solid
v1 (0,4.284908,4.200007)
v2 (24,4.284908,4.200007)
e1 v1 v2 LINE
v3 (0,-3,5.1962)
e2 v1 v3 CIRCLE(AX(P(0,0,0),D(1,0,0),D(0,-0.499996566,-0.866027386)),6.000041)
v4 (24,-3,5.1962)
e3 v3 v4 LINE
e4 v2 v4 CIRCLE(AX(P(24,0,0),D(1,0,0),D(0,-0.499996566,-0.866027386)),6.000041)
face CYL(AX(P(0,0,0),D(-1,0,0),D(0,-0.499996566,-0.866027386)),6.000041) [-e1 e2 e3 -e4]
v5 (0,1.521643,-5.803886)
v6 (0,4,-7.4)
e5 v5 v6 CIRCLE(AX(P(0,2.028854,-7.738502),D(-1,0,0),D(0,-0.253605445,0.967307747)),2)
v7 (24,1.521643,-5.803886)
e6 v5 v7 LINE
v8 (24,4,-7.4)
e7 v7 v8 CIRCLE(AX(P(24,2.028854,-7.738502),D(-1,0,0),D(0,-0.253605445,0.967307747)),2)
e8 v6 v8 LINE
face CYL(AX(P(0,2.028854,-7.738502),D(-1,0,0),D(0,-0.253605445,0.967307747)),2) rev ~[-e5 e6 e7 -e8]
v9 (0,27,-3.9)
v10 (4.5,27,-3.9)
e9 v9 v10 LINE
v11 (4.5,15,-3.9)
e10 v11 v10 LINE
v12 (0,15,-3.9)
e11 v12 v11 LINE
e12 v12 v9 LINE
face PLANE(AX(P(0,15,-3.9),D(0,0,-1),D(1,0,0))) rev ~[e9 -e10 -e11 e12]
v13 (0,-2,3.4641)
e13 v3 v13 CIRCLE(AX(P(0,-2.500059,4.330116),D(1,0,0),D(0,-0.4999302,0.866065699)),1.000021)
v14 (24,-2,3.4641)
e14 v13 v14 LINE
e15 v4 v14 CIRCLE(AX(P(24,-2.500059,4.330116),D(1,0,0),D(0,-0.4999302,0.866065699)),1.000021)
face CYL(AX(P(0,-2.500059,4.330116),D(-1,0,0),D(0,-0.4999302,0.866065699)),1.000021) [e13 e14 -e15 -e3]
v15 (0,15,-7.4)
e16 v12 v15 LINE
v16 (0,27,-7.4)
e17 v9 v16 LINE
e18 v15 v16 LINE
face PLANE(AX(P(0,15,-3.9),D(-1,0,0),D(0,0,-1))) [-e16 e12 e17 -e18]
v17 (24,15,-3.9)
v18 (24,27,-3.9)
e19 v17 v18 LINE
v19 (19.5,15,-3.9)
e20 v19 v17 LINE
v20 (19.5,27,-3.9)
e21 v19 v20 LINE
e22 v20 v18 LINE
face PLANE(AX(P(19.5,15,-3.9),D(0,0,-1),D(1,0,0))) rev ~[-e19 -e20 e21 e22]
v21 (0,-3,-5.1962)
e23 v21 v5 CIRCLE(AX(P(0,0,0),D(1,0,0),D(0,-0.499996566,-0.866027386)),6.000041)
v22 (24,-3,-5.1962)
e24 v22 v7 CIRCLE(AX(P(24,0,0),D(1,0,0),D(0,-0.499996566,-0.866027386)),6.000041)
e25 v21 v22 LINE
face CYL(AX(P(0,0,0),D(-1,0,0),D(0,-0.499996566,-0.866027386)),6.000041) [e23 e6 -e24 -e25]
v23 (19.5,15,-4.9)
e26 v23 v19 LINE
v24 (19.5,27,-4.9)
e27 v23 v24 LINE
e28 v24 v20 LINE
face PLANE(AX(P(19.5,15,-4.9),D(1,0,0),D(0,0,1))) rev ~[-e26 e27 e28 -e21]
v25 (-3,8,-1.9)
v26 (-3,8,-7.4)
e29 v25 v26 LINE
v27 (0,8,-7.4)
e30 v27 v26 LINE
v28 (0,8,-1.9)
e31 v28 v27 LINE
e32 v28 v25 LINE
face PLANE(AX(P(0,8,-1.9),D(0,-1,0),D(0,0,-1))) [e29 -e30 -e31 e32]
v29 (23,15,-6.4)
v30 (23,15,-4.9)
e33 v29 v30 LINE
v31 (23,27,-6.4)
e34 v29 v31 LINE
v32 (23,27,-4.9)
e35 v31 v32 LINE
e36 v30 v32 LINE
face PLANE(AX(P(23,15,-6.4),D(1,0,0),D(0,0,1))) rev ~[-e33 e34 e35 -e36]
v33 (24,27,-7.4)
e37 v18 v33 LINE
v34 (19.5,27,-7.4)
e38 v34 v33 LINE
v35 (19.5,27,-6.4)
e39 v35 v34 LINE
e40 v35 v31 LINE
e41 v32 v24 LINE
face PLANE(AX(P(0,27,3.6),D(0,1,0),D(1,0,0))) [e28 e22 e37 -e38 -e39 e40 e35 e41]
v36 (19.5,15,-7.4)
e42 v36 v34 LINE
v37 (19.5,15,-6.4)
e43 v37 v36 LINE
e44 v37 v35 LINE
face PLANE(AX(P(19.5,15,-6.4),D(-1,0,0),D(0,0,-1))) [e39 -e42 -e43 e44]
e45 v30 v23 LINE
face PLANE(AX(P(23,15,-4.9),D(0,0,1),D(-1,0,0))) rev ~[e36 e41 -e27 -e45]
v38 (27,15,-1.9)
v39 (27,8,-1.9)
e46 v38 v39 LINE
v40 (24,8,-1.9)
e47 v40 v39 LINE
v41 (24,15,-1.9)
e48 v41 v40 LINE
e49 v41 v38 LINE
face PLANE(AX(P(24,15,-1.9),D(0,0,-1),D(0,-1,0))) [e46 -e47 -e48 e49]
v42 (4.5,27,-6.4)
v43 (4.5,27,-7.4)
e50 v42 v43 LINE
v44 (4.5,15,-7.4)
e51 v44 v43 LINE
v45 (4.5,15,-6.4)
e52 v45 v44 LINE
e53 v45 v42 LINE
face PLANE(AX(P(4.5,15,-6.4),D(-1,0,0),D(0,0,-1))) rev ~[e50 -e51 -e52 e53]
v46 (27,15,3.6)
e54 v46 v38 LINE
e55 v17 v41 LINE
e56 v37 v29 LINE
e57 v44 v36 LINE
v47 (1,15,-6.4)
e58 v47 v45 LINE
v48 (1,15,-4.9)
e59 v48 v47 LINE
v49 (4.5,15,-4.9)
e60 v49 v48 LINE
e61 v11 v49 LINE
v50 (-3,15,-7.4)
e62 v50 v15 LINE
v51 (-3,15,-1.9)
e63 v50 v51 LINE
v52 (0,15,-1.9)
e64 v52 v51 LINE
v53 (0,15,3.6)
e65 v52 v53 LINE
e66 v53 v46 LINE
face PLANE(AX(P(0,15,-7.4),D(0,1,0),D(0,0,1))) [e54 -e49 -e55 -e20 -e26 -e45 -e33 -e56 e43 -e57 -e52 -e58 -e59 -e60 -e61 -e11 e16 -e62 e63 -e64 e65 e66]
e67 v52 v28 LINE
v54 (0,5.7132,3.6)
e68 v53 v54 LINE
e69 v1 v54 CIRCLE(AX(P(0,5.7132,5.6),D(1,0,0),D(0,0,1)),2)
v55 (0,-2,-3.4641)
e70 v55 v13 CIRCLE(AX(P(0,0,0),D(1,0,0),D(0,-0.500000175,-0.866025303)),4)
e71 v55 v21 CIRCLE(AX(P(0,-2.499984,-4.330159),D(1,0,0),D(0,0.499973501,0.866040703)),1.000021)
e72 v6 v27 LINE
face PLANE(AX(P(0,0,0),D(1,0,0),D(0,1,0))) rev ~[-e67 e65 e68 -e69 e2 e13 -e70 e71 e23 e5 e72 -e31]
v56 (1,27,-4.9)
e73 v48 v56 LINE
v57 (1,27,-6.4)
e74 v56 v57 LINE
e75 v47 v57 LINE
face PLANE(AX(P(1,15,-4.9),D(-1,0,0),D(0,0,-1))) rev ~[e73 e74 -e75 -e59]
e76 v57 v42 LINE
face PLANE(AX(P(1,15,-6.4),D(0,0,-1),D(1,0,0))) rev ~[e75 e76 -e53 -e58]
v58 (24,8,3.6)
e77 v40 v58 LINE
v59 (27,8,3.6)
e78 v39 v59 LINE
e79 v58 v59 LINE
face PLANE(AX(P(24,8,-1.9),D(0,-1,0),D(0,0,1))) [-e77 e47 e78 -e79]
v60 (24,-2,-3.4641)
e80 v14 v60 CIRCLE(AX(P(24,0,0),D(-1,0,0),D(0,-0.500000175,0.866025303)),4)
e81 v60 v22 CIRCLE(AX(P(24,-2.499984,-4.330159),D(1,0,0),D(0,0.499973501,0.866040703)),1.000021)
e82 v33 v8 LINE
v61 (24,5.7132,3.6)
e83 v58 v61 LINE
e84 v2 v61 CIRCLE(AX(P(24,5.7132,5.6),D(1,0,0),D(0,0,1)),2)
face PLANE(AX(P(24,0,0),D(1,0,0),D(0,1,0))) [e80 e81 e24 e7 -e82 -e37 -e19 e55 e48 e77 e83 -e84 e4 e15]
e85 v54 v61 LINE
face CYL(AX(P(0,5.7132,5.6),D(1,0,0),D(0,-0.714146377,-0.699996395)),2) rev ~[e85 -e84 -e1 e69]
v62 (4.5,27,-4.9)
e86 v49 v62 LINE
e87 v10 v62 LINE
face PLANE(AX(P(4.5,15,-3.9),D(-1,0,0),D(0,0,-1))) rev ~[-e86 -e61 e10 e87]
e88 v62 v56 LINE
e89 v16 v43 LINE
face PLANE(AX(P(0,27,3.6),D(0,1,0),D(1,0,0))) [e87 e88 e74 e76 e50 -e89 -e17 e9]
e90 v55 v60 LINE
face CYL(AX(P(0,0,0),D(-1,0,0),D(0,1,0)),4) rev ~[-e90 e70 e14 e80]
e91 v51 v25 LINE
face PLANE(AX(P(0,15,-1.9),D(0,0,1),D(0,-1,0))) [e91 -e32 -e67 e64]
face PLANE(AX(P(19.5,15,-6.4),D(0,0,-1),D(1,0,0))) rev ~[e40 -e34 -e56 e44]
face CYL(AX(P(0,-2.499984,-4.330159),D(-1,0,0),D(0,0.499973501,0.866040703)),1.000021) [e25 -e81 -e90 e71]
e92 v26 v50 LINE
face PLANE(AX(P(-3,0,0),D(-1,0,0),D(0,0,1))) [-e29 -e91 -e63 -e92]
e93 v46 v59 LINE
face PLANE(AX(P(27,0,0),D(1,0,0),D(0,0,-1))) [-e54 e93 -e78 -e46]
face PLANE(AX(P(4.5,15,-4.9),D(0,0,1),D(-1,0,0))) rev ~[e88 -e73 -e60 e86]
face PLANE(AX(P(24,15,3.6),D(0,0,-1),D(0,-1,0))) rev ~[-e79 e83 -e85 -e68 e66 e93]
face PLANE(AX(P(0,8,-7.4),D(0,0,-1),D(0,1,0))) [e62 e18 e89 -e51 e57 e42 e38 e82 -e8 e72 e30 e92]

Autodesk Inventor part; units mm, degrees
ref_plane "YZ Plane" through (0, 0, 0) normal (1, 0, 0) x (0, 1, 0)
ref_plane "XZ Plane" through (0, 0, 0) normal (0, 1, 0) x (-1, 0, 0)
ref_plane "XY Plane" through (0, 0, 0) normal (0, 0, 1) x (1, 0, 0)
sketch "Sketch1" plane through (0, 0, 0) normal (1, 0, 0) x (0, 1, 0)
  circle A0 centre (0, 0) radius 4
  arc A1 (-3, -5.1962) -> (-3, 5.1962) centre (0, 0) ccw
  arc A2 (-3, 5.1962) -> (-2, 3.4641) centre (-2.5, 4.3301) ccw
  arc A3 (-2, -3.4641) -> (-3, -5.1962) centre (-2.5, -4.3301) ccw
  line L0 (15, 3.6) -> (4, 3.6)
  line L1 (4, 3.6) -> (4, -7.4)
  line L2 (4, -7.4) -> (15, -7.4)
  line L3 (15, -7.4) -> (15, 3.6)
  dimension "d0" = 8
  dimension "d1" = 12
  dimension "d2" = 2.5
  dimension "d4" = 11
  dimension "d5" = 11
  dimension "d6" = 4
  dimension "d9" = 7.4
extrude "Extrusion1" add sketch "Sketch1" along normal blind 24 contours L1 A1 A3 A0 | A0 A2 A1 L0 L1 | L1 L0 A1 | A1 L0 L3 L2 L1
fillet "Fillet1" radius 2 1 edges at (12, 4, -4.4721)
fillet "Fillet2" radius 2 1 edges at (12, 4.8, 3.6)
ref_plane "Work Plane1" through (0, 4.8, -6.4) normal (0, 0, 1) x (1, 0, 0)
sketch "Sketch5" plane through (24, 0, 0) normal (1, 0, 0) x (0, 0, -1)
  line L0 (-3.6, 15) -> (-3.6, 5.7131) projected
  line L1 (-3.6, 15) -> (1.9, 15)
  line L2 (1.9, 15) -> (1.9, 8)
  line L3 (1.9, 8) -> (-3.6, 8)
  line L4 (-3.6, 8) -> (-3.6, 15)
  point P0 (0, 0)
  dimension "d31" = 5.5
  dimension "d32" = 7
extrude "Extrusion5" add sketch "Sketch5" along normal blind 3
sketch "Sketch6" plane through (0, 0, 0) normal (-1, 0, 0) x (0, 0, 1)
  line L0 (-7.4, 4) -> (-7.4, 15) projected
  line L1 (-7.4, 15) -> (-1.9, 15)
  line L2 (-1.9, 15) -> (-1.9, 8)
  line L3 (-1.9, 8) -> (-7.4, 8)
  line L4 (-7.4, 8) -> (-7.4, 15)
  point P0 (0, 0)
  point P1 (-8, 4)
  dimension "d35" = 7
  dimension "d36" = 5.5
extrude "Extrusion6" add sketch "Sketch6" along normal blind 3
sketch "Sketch11" plane through (0, 15, 3.6) normal (0, 1, 0) x (1, 0, 0)
  line L0 (0, 11) -> (24, 11) projected
  line L1 (0, 5.5) -> (0, 11) projected
  line L2 (0, 11) -> (0, 7.5)
  line L3 (24, 7.5) -> (24, 11)
  line L4 (1, 8.5) -> (1, 10)
  line L5 (23, 10) -> (23, 8.5)
  line L6 (19.5, 8.5) -> (19.5, 7.5)
  line L7 (19.5, 10) -> (19.5, 11)
  line L8 (-3, 11) -> (24, 11) projected
  line L9 (4.5, 7.5) -> (4.5, 8.5)
  line L10 (4.5, 10) -> (4.5, 11)
  line L11 (19.5, 10) -> (19.5, 11)
  line L12 (18.3, 11) -> (21.5, 11) projected
  line L13 (1, 10) -> (4.5, 10)
  line L14 (19.5, 10) -> (23, 10)
  line L15 (24, 11) -> (19.5, 11)
  line L16 (4.5, 11) -> (0, 11)
  line L17 (23, 8.5) -> (19.5, 8.5)
  line L18 (4.5, 8.5) -> (1, 8.5)
  line L19 (0, 7.5) -> (4.5, 7.5)
  line L20 (19.5, 7.5) -> (24, 7.5)
  point P0 (0, 3.6)
  point P1 (23, 9.25)
  point P2 (24, 9.4038)
  point P3 (24, 9.25)
  point P4 (1, 9.25)
  point P5 (21.75, 7.5)
  point P6 (2.25, 7.5)
  point P7 (2.75, 8.5)
  point P8 (21.25, 8.5)
  point P9 (21.25, 10)
  point P10 (2.75, 10)
  point P11 (21.75, 11)
  point P12 (2.25, 11)
  dimension "d62" = 1.5
  dimension "d63" = 1
  dimension "d64" = 15
  dimension "d70" = 4.5
  dimension "d71" = 3.5
  dimension "d72" = 1
extrude "Extrusion10" add sketch "Sketch11" along normal blind 12
properties part number "Roller_Switch end"
